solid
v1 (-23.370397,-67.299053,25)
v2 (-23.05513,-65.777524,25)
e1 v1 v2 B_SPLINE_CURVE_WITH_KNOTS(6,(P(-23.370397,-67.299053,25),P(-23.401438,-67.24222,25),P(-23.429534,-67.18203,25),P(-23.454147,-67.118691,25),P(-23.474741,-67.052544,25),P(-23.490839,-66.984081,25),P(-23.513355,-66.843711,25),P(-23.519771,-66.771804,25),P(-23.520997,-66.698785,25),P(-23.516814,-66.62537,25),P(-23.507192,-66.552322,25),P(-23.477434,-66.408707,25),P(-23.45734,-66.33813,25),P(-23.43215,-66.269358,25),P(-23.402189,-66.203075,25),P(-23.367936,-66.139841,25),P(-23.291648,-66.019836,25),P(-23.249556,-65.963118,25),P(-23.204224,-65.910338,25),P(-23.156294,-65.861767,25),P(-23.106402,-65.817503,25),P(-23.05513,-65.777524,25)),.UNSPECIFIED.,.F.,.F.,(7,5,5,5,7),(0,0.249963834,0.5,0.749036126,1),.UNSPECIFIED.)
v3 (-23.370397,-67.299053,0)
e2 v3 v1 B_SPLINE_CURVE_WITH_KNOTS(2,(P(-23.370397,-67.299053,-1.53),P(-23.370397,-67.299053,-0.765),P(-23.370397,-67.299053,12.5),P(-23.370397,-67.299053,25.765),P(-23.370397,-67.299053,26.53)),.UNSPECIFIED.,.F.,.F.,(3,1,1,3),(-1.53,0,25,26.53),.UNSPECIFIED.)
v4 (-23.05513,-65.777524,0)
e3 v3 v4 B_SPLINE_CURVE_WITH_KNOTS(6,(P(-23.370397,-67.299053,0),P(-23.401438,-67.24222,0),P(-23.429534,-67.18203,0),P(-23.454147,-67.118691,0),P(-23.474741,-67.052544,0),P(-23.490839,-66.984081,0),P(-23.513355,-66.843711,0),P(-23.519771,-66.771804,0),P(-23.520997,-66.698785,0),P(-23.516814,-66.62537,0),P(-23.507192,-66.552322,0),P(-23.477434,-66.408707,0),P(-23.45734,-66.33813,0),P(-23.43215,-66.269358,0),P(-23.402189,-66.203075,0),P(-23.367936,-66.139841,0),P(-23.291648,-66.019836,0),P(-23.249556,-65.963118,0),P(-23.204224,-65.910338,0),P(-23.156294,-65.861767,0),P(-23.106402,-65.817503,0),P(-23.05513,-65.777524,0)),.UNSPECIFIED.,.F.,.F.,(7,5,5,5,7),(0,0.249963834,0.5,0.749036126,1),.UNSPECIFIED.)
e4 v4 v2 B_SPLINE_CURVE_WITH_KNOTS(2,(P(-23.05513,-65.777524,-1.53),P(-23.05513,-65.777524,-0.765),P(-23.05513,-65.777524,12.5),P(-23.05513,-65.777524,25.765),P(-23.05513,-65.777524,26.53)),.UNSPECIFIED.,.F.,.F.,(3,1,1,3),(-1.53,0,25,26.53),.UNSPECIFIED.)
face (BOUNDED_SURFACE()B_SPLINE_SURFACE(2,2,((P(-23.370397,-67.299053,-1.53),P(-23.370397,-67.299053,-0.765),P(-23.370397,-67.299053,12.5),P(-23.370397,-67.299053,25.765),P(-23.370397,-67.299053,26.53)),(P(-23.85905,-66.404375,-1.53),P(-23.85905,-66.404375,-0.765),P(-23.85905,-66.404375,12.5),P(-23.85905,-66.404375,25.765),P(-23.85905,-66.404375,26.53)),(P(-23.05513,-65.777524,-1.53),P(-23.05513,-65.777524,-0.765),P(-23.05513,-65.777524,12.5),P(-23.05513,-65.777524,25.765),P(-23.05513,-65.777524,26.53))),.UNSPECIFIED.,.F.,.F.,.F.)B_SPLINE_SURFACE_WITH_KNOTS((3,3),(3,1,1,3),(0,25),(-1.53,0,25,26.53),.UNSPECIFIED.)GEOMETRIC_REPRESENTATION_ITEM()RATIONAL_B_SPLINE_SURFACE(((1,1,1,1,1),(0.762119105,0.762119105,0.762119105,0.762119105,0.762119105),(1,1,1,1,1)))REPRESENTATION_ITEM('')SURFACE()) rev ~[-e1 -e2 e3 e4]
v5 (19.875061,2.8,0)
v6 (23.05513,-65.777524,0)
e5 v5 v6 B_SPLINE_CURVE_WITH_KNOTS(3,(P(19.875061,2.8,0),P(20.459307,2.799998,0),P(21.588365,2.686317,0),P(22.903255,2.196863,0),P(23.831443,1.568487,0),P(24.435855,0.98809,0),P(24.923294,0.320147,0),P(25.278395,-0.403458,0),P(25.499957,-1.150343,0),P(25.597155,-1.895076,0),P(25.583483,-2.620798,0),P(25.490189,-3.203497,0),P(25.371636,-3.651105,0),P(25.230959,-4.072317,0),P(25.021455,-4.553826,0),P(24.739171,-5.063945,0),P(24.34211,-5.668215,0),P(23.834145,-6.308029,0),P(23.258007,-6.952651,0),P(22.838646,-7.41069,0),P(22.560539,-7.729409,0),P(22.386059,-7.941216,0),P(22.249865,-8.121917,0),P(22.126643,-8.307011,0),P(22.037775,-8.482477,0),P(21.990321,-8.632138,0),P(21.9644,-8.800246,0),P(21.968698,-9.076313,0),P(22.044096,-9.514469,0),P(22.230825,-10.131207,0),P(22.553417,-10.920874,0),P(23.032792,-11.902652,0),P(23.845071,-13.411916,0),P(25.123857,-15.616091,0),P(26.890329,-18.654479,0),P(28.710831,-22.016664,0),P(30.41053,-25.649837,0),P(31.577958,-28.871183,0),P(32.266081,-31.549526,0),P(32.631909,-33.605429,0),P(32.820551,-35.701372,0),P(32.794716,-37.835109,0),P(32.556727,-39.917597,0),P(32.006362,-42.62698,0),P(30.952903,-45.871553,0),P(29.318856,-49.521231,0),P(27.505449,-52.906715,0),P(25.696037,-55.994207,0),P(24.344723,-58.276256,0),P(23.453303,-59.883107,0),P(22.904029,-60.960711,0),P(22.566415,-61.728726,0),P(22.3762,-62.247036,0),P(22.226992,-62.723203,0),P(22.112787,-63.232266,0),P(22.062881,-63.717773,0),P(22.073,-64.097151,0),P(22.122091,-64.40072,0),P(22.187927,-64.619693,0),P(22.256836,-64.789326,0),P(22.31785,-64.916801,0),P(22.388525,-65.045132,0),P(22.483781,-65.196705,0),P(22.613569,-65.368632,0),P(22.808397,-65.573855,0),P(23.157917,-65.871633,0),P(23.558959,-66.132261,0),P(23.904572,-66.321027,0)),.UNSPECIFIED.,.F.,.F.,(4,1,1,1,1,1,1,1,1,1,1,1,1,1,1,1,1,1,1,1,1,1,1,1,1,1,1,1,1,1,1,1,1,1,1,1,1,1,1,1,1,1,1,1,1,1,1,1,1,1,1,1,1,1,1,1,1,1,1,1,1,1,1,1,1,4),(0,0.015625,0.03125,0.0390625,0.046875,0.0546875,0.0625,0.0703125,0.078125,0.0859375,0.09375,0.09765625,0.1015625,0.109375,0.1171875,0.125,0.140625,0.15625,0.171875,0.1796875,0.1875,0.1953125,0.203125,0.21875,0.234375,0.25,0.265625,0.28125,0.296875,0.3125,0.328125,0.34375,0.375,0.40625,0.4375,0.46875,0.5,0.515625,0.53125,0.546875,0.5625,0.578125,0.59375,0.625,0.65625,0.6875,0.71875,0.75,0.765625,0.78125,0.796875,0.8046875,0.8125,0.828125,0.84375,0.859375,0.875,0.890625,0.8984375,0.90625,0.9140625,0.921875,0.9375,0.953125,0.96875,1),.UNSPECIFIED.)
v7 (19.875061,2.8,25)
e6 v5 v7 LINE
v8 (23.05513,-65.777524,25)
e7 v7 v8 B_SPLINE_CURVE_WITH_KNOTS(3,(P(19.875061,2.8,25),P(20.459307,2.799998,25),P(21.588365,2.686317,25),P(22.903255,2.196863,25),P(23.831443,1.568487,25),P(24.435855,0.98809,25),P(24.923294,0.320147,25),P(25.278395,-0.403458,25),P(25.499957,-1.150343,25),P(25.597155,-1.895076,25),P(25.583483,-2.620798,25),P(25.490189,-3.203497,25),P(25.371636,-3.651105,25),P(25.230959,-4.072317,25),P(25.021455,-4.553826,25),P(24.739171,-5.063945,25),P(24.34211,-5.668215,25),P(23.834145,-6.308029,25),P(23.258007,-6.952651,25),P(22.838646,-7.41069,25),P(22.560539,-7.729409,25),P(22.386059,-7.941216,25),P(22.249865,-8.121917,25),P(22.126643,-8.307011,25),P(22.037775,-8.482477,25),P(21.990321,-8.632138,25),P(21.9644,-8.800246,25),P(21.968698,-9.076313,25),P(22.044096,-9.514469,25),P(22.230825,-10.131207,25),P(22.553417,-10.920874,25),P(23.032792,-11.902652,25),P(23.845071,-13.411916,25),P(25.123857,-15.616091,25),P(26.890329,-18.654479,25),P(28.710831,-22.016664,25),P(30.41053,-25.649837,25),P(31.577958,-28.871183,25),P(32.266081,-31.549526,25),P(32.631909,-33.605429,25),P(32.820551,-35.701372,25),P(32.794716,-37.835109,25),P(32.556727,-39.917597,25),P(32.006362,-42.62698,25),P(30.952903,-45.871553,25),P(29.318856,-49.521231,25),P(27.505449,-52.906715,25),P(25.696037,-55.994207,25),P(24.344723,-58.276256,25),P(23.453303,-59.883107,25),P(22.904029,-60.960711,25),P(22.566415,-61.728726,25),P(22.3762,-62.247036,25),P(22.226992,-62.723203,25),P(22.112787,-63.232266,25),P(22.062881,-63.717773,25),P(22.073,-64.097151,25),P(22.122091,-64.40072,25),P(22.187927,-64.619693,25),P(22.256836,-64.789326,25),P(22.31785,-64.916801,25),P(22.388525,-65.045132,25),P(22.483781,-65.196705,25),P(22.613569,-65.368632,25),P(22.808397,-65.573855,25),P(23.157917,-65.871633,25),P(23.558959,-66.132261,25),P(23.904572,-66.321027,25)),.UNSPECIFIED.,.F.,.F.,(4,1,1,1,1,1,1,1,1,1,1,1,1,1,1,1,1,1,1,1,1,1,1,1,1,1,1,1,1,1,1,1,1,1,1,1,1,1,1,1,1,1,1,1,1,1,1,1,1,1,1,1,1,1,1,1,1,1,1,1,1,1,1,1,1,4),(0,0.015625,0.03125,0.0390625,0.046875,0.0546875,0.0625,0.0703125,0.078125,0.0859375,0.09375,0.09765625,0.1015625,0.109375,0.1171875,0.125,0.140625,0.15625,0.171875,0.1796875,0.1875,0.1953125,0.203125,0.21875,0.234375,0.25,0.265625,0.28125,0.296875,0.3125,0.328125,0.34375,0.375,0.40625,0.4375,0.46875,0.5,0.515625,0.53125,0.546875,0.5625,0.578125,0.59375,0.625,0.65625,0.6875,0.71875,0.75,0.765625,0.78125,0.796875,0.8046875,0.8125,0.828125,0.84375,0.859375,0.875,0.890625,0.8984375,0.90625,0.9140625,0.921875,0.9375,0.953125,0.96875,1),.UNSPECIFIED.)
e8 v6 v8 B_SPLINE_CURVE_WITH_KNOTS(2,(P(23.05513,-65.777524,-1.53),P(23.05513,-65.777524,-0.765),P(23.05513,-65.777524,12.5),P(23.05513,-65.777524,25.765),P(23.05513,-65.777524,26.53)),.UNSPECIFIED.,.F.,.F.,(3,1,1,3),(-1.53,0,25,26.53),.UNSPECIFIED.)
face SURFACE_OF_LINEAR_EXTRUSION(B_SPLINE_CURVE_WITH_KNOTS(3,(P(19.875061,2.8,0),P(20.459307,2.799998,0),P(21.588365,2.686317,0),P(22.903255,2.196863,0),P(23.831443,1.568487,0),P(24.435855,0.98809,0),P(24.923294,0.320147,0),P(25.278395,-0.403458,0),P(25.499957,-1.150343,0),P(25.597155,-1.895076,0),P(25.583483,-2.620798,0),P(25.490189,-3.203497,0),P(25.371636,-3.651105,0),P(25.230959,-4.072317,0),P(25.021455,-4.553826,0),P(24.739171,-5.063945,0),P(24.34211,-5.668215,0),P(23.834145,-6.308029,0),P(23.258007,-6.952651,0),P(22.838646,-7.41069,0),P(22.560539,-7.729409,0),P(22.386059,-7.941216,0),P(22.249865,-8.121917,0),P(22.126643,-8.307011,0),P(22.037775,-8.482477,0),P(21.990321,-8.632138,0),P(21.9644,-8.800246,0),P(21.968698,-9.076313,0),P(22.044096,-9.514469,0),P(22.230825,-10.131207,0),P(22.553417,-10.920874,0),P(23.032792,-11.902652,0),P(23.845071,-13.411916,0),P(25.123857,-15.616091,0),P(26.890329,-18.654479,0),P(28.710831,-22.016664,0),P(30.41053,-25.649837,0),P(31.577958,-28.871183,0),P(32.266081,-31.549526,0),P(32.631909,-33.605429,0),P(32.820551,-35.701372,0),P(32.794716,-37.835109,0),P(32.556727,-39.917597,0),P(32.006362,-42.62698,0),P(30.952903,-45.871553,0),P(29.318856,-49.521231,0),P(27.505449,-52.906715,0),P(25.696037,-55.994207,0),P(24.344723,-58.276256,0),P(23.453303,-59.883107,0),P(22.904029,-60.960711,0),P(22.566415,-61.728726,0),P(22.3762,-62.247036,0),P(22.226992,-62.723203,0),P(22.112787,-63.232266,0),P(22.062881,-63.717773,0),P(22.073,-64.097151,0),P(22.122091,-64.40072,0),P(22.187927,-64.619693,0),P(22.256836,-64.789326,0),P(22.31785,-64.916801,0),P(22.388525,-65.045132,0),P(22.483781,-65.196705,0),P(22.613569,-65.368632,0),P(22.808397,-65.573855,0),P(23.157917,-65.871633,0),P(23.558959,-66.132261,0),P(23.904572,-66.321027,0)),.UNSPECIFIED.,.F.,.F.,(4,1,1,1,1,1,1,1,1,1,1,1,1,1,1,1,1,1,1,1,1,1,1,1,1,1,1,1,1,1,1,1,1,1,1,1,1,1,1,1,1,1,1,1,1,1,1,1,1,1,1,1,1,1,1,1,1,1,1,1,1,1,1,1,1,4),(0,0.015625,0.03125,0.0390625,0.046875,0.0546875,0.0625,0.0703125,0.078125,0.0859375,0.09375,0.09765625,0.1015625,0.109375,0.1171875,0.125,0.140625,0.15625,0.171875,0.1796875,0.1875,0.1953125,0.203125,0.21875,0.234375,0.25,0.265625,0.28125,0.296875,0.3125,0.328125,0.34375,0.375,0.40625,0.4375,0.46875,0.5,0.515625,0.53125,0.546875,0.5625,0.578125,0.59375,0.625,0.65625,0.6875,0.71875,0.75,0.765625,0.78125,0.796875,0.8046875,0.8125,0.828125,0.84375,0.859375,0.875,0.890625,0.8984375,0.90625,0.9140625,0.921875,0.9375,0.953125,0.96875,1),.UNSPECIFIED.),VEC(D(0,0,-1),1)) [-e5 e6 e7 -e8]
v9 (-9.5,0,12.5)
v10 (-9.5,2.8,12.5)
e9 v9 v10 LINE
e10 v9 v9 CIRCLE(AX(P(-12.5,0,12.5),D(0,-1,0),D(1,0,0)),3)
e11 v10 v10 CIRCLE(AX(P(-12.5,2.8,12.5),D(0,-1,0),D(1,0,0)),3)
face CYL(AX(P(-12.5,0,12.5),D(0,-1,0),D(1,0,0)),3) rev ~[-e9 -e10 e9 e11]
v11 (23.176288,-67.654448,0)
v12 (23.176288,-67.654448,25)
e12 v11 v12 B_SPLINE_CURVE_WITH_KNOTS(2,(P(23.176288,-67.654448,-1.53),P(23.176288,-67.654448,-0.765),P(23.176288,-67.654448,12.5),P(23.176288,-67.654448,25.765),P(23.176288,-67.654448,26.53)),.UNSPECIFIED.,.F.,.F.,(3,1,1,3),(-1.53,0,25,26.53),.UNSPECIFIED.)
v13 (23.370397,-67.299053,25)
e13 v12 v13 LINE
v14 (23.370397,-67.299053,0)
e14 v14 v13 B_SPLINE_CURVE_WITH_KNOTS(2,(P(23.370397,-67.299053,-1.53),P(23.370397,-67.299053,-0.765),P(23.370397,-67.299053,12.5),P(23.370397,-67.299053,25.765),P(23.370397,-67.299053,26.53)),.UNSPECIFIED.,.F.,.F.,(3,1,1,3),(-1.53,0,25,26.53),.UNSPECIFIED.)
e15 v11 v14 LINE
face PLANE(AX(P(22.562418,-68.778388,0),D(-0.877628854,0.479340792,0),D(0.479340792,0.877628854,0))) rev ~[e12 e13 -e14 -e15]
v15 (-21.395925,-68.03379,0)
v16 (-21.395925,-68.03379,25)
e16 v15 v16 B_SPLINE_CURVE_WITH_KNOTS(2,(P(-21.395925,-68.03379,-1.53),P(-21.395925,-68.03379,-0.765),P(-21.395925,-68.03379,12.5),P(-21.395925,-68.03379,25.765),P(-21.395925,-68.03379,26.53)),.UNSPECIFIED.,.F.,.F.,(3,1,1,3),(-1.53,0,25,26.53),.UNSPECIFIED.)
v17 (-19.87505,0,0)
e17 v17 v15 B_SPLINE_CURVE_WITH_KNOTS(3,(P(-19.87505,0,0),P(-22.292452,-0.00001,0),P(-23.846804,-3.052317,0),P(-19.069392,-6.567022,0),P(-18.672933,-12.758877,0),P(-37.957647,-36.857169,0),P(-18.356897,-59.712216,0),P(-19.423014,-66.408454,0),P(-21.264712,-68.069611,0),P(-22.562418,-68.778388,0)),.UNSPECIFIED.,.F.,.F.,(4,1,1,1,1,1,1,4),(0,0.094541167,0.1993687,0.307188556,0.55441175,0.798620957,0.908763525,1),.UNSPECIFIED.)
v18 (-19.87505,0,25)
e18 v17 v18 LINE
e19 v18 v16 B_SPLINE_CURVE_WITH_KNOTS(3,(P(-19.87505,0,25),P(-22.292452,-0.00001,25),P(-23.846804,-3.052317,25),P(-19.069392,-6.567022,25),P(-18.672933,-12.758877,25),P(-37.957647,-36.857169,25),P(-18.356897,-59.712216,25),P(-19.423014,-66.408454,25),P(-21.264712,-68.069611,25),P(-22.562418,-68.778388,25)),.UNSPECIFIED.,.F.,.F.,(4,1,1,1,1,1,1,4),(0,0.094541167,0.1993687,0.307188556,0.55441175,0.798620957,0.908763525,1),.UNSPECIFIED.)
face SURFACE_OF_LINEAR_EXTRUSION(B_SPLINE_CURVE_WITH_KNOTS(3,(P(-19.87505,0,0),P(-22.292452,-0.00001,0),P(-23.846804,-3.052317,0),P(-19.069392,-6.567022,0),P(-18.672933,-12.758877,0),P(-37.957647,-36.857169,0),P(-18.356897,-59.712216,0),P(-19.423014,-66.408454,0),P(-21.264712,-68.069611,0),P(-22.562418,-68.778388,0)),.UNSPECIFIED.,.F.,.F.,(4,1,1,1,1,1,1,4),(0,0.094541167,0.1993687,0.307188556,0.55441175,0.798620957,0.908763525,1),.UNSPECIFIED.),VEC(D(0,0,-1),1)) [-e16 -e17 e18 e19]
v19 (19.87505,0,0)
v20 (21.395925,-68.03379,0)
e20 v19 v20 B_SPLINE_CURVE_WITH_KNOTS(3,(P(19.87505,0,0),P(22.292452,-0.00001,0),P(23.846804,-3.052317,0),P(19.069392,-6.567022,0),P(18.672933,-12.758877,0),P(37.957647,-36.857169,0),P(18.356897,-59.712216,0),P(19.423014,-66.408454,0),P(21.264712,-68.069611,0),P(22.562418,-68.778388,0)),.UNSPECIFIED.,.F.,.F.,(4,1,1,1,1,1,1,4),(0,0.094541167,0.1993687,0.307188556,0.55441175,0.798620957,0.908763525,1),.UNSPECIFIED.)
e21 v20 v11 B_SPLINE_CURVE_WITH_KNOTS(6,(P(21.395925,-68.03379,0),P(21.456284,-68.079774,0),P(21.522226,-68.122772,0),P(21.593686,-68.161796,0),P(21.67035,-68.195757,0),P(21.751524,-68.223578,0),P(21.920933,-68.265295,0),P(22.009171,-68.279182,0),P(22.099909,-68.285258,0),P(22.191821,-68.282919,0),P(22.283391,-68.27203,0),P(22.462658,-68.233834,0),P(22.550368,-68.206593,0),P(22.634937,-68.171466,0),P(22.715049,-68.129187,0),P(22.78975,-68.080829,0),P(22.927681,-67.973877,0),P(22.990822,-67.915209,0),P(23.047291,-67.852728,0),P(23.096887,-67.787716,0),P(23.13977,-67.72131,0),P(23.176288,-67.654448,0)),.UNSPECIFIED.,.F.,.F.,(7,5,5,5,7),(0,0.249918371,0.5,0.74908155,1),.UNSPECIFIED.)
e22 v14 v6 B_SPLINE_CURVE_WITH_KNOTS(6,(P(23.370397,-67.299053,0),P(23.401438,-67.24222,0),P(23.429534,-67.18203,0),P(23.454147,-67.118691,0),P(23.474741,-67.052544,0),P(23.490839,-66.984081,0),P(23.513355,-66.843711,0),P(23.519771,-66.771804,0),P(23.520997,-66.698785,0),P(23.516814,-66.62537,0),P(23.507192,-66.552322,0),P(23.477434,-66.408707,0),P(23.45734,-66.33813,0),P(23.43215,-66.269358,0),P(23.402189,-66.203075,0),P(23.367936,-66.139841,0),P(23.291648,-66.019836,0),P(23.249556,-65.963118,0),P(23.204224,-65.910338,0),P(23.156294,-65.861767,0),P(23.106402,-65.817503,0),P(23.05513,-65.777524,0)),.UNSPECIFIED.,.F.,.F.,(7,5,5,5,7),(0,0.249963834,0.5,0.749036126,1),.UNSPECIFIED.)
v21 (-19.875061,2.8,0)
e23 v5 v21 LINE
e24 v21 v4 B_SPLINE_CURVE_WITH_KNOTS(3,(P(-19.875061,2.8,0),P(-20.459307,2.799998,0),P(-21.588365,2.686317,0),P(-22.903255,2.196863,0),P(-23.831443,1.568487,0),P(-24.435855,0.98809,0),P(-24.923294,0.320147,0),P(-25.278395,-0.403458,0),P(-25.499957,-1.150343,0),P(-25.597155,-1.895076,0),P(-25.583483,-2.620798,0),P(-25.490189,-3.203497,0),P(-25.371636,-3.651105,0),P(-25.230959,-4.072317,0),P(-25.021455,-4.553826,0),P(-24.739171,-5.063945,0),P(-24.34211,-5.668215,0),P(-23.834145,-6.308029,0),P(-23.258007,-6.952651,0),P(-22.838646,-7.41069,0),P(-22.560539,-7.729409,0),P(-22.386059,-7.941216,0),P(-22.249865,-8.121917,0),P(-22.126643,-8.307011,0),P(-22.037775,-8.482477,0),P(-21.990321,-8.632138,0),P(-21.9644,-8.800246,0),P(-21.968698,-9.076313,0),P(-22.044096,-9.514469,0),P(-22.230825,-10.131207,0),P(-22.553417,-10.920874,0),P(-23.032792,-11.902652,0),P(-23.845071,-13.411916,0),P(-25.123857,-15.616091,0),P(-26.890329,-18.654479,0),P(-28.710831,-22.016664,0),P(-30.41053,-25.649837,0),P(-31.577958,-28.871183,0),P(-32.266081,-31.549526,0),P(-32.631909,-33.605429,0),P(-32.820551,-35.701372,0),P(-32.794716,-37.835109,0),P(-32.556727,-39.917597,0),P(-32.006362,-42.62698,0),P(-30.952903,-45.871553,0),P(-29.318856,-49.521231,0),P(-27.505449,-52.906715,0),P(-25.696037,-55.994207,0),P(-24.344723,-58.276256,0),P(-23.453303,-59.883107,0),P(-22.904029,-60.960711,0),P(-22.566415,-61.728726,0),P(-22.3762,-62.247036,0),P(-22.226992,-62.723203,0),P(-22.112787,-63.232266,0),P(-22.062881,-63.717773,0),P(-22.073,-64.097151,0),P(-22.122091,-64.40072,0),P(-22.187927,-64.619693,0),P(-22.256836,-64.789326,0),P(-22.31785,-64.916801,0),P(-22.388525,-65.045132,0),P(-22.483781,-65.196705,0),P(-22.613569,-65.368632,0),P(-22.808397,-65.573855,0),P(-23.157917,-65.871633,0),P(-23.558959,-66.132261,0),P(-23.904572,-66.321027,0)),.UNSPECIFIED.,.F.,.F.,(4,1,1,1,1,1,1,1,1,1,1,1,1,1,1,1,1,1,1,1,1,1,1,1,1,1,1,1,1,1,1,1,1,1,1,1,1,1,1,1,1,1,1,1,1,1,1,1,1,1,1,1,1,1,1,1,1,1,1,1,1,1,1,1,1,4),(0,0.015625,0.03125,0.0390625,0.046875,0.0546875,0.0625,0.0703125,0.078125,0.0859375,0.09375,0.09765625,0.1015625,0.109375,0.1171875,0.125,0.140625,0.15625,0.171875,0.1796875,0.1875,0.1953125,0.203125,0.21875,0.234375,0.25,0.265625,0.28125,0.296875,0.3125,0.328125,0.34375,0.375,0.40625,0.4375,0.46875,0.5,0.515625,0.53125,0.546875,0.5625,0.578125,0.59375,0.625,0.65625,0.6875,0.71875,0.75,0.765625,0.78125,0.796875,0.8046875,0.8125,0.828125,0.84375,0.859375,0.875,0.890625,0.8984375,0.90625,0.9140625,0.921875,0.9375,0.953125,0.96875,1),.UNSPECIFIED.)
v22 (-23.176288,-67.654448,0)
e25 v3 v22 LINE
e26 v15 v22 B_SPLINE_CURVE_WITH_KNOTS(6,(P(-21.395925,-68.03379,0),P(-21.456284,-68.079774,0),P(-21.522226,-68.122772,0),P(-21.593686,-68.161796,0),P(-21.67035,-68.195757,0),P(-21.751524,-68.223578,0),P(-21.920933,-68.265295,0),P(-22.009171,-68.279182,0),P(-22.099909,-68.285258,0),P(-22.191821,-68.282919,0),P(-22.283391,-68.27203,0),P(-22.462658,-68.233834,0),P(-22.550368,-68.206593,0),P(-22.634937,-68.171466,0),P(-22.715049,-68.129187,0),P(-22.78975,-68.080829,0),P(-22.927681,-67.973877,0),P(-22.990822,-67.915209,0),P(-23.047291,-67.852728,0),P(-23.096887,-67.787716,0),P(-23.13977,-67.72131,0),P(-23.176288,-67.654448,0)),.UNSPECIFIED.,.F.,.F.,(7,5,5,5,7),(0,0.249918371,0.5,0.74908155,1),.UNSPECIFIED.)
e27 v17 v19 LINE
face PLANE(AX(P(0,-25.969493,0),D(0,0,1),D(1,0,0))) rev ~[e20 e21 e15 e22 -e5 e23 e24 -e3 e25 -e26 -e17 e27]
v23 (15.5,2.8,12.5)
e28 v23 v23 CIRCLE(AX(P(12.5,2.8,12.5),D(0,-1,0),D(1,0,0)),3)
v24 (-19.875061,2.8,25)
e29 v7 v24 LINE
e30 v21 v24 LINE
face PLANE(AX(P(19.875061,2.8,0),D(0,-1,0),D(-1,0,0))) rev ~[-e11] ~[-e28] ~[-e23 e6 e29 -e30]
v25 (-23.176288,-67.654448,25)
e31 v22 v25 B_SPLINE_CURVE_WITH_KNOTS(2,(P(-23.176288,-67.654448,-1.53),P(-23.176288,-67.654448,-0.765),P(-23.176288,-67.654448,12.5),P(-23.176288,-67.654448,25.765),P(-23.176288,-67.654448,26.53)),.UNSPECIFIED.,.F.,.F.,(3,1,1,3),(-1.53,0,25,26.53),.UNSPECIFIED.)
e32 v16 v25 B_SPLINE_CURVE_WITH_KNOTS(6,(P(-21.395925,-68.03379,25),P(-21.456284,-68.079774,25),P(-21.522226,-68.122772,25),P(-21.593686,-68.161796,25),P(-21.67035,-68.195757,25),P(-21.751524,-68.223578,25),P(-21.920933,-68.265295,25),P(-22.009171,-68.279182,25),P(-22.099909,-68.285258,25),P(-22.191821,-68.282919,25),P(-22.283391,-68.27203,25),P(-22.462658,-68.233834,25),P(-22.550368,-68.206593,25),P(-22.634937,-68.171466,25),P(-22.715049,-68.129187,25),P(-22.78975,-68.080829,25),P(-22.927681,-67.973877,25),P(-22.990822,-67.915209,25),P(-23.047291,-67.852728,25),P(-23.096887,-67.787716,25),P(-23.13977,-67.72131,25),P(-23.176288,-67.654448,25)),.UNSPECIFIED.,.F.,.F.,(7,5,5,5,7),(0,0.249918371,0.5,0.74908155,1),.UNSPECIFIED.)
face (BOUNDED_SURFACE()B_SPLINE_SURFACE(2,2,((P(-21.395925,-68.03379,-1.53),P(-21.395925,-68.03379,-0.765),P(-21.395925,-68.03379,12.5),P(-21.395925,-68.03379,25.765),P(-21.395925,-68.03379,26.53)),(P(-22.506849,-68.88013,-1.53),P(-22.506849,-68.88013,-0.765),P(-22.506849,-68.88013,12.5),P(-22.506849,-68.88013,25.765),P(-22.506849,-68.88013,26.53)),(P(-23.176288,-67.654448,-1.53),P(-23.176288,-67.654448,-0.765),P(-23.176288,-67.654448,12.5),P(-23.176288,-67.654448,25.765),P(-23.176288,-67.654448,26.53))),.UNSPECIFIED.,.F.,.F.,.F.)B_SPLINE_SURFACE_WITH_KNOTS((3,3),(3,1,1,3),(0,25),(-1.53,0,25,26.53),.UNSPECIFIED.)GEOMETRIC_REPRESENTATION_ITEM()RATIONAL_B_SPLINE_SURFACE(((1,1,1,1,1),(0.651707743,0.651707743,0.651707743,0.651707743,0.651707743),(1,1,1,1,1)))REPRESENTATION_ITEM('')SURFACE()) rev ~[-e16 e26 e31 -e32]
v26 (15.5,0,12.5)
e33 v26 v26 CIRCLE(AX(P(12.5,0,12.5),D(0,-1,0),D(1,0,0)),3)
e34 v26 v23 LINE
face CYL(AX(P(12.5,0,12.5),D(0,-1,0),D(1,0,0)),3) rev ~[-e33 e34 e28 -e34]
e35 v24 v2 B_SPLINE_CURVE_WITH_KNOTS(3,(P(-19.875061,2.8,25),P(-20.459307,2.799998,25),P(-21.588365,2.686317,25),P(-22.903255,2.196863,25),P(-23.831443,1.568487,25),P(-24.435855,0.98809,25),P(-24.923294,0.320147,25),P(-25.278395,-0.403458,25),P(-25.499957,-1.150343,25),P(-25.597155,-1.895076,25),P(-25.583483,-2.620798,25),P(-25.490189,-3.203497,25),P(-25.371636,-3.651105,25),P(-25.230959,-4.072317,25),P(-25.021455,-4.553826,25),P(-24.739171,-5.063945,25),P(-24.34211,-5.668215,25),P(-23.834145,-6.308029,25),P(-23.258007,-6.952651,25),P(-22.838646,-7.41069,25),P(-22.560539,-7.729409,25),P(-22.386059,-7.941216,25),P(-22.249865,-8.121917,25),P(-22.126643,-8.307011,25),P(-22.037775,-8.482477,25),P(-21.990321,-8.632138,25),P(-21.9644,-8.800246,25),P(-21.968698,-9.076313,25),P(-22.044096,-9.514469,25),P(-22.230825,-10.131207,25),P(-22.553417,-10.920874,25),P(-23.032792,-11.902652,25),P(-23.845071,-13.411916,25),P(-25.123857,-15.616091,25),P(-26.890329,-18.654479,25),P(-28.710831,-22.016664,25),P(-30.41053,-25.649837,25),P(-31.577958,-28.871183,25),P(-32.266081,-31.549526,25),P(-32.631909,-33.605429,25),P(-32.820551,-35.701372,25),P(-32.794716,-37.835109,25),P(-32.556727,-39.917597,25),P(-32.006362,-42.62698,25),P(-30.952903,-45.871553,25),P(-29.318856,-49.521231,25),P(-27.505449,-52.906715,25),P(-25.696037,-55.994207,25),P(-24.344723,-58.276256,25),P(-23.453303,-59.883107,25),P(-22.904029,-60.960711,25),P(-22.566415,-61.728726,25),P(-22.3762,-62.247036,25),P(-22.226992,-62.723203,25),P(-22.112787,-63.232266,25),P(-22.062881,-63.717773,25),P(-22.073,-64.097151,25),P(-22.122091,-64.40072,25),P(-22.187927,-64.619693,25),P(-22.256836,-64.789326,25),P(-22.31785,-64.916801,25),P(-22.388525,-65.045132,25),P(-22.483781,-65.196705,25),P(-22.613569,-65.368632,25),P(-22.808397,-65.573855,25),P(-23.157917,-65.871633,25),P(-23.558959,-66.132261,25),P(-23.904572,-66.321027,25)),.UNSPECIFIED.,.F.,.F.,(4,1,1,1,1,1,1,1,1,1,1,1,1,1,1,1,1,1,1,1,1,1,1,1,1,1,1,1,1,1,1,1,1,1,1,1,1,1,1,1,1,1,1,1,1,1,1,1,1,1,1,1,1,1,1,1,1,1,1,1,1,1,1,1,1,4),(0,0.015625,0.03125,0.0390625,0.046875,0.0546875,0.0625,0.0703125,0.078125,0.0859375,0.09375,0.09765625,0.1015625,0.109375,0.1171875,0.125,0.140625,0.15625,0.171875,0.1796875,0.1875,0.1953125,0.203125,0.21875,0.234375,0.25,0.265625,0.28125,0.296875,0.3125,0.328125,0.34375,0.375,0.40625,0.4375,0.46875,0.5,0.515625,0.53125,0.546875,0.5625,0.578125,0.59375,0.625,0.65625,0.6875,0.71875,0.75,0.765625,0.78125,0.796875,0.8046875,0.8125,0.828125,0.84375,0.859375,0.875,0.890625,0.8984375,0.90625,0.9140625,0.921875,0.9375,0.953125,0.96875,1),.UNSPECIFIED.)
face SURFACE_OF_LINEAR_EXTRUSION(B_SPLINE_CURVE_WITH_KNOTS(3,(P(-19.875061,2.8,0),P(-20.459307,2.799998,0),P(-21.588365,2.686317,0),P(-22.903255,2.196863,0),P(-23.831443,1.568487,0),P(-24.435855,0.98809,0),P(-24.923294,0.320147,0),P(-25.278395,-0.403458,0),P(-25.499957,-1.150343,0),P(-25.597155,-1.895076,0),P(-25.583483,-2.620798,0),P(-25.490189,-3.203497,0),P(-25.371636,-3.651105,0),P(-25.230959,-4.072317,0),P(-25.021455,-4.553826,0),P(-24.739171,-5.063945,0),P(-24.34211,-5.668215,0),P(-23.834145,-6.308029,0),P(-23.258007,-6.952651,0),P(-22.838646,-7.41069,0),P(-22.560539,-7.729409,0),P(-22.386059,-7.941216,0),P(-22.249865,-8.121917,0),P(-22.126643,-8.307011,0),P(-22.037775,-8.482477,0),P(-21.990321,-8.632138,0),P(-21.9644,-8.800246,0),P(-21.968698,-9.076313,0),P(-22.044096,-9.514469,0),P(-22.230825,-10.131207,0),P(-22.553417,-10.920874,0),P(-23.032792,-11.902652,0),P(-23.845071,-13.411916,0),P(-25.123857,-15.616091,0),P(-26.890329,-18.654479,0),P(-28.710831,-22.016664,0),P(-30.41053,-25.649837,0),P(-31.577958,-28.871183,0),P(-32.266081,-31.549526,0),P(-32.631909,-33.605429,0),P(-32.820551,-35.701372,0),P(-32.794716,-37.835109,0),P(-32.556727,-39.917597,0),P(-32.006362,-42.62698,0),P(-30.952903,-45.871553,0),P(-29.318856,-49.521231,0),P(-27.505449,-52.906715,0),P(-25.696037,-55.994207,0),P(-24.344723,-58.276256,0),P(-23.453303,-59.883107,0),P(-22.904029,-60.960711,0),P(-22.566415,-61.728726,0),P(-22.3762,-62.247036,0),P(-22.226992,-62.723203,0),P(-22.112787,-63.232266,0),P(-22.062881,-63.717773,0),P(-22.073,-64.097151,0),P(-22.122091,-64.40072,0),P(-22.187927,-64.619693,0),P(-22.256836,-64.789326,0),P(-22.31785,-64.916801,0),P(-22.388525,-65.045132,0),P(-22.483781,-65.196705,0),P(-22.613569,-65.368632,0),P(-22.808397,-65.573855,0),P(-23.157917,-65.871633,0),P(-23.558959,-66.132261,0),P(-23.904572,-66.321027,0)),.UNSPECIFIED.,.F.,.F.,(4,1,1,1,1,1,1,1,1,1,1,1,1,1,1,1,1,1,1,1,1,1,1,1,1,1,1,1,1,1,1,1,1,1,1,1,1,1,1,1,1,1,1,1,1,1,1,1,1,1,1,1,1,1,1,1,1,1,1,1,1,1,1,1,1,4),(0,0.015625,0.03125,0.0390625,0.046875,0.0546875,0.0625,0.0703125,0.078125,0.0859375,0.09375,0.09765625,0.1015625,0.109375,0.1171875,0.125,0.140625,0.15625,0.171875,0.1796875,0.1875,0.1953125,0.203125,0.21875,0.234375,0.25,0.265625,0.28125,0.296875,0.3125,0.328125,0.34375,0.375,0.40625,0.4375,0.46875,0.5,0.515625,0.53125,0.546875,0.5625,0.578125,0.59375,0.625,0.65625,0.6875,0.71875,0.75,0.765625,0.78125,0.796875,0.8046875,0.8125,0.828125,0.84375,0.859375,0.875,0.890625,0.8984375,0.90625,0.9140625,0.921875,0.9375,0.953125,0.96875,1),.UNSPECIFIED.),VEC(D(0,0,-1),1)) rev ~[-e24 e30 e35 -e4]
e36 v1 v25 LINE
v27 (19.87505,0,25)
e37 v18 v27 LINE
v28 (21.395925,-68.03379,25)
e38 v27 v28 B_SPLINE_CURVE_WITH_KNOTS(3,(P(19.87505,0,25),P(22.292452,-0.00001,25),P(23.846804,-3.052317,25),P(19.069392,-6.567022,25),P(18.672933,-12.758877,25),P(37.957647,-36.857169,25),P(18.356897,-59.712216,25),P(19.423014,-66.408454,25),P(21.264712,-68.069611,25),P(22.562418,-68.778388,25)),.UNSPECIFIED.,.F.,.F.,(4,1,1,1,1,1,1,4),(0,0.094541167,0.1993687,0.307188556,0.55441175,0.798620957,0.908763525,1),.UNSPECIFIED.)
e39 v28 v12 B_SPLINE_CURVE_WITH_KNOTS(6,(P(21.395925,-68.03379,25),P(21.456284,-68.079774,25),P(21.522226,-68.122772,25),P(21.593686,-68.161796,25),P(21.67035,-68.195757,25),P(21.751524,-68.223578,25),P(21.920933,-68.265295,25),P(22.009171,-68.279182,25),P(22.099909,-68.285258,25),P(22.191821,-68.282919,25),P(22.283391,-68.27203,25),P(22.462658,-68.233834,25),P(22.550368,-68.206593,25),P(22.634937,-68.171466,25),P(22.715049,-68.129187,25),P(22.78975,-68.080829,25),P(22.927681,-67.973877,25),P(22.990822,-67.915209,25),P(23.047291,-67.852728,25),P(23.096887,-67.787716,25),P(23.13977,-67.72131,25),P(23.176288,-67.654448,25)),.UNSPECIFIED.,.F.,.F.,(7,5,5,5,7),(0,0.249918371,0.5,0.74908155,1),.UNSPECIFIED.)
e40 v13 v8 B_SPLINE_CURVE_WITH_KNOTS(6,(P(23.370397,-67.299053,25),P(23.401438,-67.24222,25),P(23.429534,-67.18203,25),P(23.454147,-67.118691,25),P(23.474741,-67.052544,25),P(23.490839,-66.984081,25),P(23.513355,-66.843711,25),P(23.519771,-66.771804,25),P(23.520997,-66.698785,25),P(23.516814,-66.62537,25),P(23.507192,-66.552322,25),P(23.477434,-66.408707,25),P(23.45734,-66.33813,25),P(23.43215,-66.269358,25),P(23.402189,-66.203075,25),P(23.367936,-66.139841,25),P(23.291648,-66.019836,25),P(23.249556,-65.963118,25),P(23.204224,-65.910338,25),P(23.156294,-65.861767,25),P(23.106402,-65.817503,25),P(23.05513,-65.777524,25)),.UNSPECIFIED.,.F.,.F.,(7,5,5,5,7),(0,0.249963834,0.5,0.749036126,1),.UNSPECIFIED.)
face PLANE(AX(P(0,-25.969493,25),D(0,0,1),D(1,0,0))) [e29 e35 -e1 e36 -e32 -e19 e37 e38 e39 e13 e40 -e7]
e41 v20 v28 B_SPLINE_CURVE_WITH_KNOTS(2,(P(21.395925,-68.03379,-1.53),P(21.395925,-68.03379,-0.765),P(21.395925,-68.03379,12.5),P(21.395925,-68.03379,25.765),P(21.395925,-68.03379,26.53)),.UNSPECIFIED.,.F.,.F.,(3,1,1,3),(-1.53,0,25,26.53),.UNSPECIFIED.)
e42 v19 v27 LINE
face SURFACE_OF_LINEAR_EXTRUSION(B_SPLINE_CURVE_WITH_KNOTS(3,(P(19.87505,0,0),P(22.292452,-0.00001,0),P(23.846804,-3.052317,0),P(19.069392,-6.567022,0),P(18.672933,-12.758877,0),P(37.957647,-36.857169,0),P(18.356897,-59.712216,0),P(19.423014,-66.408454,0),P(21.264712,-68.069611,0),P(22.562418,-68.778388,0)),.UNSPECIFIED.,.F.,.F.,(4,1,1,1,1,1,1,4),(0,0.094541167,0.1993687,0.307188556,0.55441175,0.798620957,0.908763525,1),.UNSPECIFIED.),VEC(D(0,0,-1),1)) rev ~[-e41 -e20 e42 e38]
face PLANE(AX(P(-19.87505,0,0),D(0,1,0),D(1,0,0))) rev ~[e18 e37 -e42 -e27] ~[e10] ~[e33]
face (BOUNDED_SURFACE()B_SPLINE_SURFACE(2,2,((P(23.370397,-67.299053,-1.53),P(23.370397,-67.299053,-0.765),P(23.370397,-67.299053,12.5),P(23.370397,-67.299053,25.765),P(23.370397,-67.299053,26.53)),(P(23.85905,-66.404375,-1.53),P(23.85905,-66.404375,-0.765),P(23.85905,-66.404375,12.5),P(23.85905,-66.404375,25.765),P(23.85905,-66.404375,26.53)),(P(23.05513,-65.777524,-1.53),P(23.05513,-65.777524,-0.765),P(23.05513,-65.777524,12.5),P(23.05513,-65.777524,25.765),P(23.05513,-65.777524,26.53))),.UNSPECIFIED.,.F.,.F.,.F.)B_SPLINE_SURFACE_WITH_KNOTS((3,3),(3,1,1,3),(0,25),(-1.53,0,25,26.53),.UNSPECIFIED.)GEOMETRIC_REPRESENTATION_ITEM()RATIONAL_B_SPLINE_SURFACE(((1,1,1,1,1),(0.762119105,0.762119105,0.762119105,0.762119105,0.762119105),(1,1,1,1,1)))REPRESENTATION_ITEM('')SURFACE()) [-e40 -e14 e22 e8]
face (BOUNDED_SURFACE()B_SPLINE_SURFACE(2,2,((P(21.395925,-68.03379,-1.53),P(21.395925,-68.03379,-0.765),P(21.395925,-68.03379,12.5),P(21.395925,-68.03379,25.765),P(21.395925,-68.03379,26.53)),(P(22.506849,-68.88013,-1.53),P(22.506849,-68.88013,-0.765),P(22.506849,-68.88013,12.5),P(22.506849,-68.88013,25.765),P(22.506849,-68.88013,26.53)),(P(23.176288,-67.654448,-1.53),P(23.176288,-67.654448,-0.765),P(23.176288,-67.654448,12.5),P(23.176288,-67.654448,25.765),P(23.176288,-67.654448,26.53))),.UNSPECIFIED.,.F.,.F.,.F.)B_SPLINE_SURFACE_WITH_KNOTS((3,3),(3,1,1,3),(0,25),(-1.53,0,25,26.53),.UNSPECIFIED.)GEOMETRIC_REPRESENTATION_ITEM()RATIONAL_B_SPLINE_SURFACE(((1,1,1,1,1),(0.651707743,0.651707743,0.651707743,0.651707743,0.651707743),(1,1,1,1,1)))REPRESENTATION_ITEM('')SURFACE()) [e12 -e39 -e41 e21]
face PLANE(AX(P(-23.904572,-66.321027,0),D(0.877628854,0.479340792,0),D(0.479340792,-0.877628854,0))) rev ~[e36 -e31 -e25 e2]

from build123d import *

# Parameters (mm, degrees)
F1_DEPTH = 25
F2_R     = 3
F3_DEPTH = 25
F4_R     = 1.2


# Not quite as in the source:
# - the dataset's text gives a spline's control points without its knots; the knots are read off the source's solid


with BuildPart() as f1:
    # F0 (on Top) → F1 (new body)
    with BuildSketch(Plane.XY):
        with BuildLine():
            Line((-19.8750495911, 0), (0, 0))
            Line((0, 0), (19.8750495911, 0))
            add(Edge.make_bspline(
                [(19.8750495911, 0), (22.2924524796, -9.5208e-06), (23.8468038816, -3.0523168549), (19.0693924552, -6.5670221707), (18.6729332639, -12.7588770638), (37.9576470343, -36.8571689193), (18.3568969249, -59.7122156399), (19.423014069, -66.4084536548), (21.2647124099, -68.0696110384), (22.562418133, -68.7783882022)],
                knots=[0, 0, 0, 0, 0.0945411672, 0.1993686999, 0.3071885555, 0.5544117499, 0.7986209568, 0.9087635251, 1, 1, 1, 1], degree=3))
            Line((22.562418133, -68.7783882022), (23.9045723519, -66.3210274121))
            add(Edge.make_bspline(
                [(19.8750606187, 2.8), (20.4593069859, 2.799997699), (21.5883647785, 2.6863173566), (22.9032546448, 2.1968633988), (23.8314426543, 1.5684869445), (24.435854505, 0.9880902727), (24.9232939323, 0.3201474741), (25.2783951523, -0.4034584687), (25.4999568914, -1.1503426565), (25.5971545038, -1.8950756512), (25.5834825611, -2.6207983738), (25.4901886128, -3.2034968646), (25.3716356249, -3.6511053376), (25.2309586179, -4.0723173675), (25.0214545116, -4.5538263985), (24.7391708776, -5.0639453956), (24.3421099364, -5.6682154891), (23.8341446747, -6.3080287414), (23.2580066814, -6.9526509281), (22.8386460714, -7.410690486), (22.5605388052, -7.729409075), (22.3860591598, -7.9412155998), (22.2498645667, -8.1219170001), (22.1266426007, -8.3070114205), (22.0377754259, -8.4824771505), (21.9903206529, -8.6321382793), (21.9643998721, -8.8002455288), (21.9686979601, -9.0763133266), (22.0440959051, -9.5144686085), (22.2308250058, -10.1312073308), (22.5534171189, -10.9208744064), (23.0327923343, -11.902651775), (23.8450711076, -13.4119164755), (25.1238572248, -15.6160909141), (26.8903289815, -18.6544793295), (28.7108310762, -22.0166637858), (30.4105304557, -25.6498365655), (31.5779576864, -28.871182811), (32.2660810741, -31.5495260763), (32.6319090351, -33.6054292675), (32.8205512079, -35.7013715538), (32.794715562, -37.8351090141), (32.5567271095, -39.9175968775), (32.0063619416, -42.6269799256), (30.952903282, -45.8715528951), (29.318855882, -49.5212306518), (27.5054488177, -52.9067151854), (25.696037368, -55.9942070619), (24.3447227252, -58.2762559642), (23.4533034554, -59.8831067643), (22.904028849, -60.9607111118), (22.5664151147, -61.7287262628), (22.3761997694, -62.2470363726), (22.2269924721, -62.7232034294), (22.1127869942, -63.2322655125), (22.0628810378, -63.7177729426), (22.0729996001, -64.0971510525), (22.1220907308, -64.4007199093), (22.1879270254, -64.6196927194), (22.2568363773, -64.7893256597), (22.317850339, -64.9168005859), (22.3885249864, -65.0451322219), (22.4837806609, -65.1967051299), (22.61356875, -65.3686320853), (22.8083966888, -65.5738545979), (23.1579171235, -65.8716332359), (23.5589591357, -66.1322613839), (23.9045723519, -66.3210274121)],
                knots=[0, 0, 0, 0, 0.015625, 0.03125, 0.0390625, 0.046875, 0.0546875, 0.0625, 0.0703125, 0.078125, 0.0859375, 0.09375, 0.09765625, 0.1015625, 0.109375, 0.1171875, 0.125, 0.140625, 0.15625, 0.171875, 0.1796875, 0.1875, 0.1953125, 0.203125, 0.21875, 0.234375, 0.25, 0.265625, 0.28125, 0.296875, 0.3125, 0.328125, 0.34375, 0.375, 0.40625, 0.4375, 0.46875, 0.5, 0.515625, 0.53125, 0.546875, 0.5625, 0.578125, 0.59375, 0.625, 0.65625, 0.6875, 0.71875, 0.75, 0.765625, 0.78125, 0.796875, 0.8046875, 0.8125, 0.828125, 0.84375, 0.859375, 0.875, 0.890625, 0.8984375, 0.90625, 0.9140625, 0.921875, 0.9375, 0.953125, 0.96875, 1, 1, 1, 1], degree=3))
            Line((19.8750606187, 2.8), (0, 2.8))
            Line((0, 2.8), (-19.8750606187, 2.8))
            add(Edge.make_bspline(
                [(-19.8750606187, 2.8), (-20.4593069859, 2.799997699), (-21.5883647785, 2.6863173566), (-22.9032546448, 2.1968633988), (-23.8314426543, 1.5684869445), (-24.435854505, 0.9880902727), (-24.9232939323, 0.3201474741), (-25.2783951523, -0.4034584687), (-25.4999568914, -1.1503426565), (-25.5971545038, -1.8950756512), (-25.5834825611, -2.6207983738), (-25.4901886128, -3.2034968646), (-25.3716356249, -3.6511053376), (-25.2309586179, -4.0723173675), (-25.0214545116, -4.5538263985), (-24.7391708776, -5.0639453956), (-24.3421099364, -5.6682154891), (-23.8341446747, -6.3080287414), (-23.2580066814, -6.9526509281), (-22.8386460714, -7.410690486), (-22.5605388052, -7.729409075), (-22.3860591598, -7.9412155998), (-22.2498645667, -8.1219170001), (-22.1266426007, -8.3070114205), (-22.0377754259, -8.4824771505), (-21.9903206529, -8.6321382793), (-21.9643998721, -8.8002455288), (-21.9686979601, -9.0763133266), (-22.0440959051, -9.5144686085), (-22.2308250058, -10.1312073308), (-22.5534171189, -10.9208744064), (-23.0327923343, -11.902651775), (-23.8450711076, -13.4119164755), (-25.1238572248, -15.6160909141), (-26.8903289815, -18.6544793295), (-28.7108310762, -22.0166637858), (-30.4105304557, -25.6498365655), (-31.5779576864, -28.871182811), (-32.2660810741, -31.5495260763), (-32.6319090351, -33.6054292675), (-32.8205512079, -35.7013715538), (-32.794715562, -37.8351090141), (-32.5567271095, -39.9175968775), (-32.0063619416, -42.6269799256), (-30.952903282, -45.8715528951), (-29.318855882, -49.5212306518), (-27.5054488177, -52.9067151854), (-25.696037368, -55.9942070619), (-24.3447227252, -58.2762559642), (-23.4533034554, -59.8831067643), (-22.904028849, -60.9607111118), (-22.5664151147, -61.7287262628), (-22.3761997694, -62.2470363726), (-22.2269924721, -62.7232034294), (-22.1127869942, -63.2322655125), (-22.0628810378, -63.7177729426), (-22.0729996001, -64.0971510525), (-22.1220907308, -64.4007199093), (-22.1879270254, -64.6196927194), (-22.2568363773, -64.7893256597), (-22.317850339, -64.9168005859), (-22.3885249864, -65.0451322219), (-22.4837806609, -65.1967051299), (-22.61356875, -65.3686320853), (-22.8083966888, -65.5738545979), (-23.1579171235, -65.8716332359), (-23.5589591357, -66.1322613839), (-23.9045723519, -66.3210274121)],
                knots=[0, 0, 0, 0, 0.015625, 0.03125, 0.0390625, 0.046875, 0.0546875, 0.0625, 0.0703125, 0.078125, 0.0859375, 0.09375, 0.09765625, 0.1015625, 0.109375, 0.1171875, 0.125, 0.140625, 0.15625, 0.171875, 0.1796875, 0.1875, 0.1953125, 0.203125, 0.21875, 0.234375, 0.25, 0.265625, 0.28125, 0.296875, 0.3125, 0.328125, 0.34375, 0.375, 0.40625, 0.4375, 0.46875, 0.5, 0.515625, 0.53125, 0.546875, 0.5625, 0.578125, 0.59375, 0.625, 0.65625, 0.6875, 0.71875, 0.75, 0.765625, 0.78125, 0.796875, 0.8046875, 0.8125, 0.828125, 0.84375, 0.859375, 0.875, 0.890625, 0.8984375, 0.90625, 0.9140625, 0.921875, 0.9375, 0.953125, 0.96875, 1, 1, 1, 1], degree=3))
            Line((-23.9045723519, -66.3210274121), (-22.562418133, -68.7783882022))
            add(Edge.make_bspline(
                [(-19.8750495911, 0), (-22.2924524796, -9.5208e-06), (-23.8468038816, -3.0523168549), (-19.0693924552, -6.5670221707), (-18.6729332639, -12.7588770638), (-37.9576470343, -36.8571689193), (-18.3568969249, -59.7122156399), (-19.423014069, -66.4084536548), (-21.2647124099, -68.0696110384), (-22.562418133, -68.7783882022)],
                knots=[0, 0, 0, 0, 0.0945411672, 0.1993686999, 0.3071885555, 0.5544117499, 0.7986209568, 0.9087635251, 1, 1, 1, 1], degree=3))
        make_face()
    extrude(amount=F1_DEPTH)

    # F2 (on face) → F3 (cut)
    with BuildSketch(Plane.XZ):
        with Locations((-12.5, 12.5)):
            Circle(F2_R)
        with Locations((12.5, 12.5)):
            Circle(F2_R)
    extrude(amount=-F3_DEPTH, mode=Mode.SUBTRACT)

    # F4
    f4_edges = [f1.edges().sort_by_distance(p)[0] for p in [
        (-22.562418, -68.778388, 12.5),
        (-23.904572, -66.321027, 12.5),
        (22.562418, -68.778388, 12.5),
        (23.904572, -66.321027, 12.5),
    ]]
    fillet(f4_edges, radius=F4_R)


solid = f1.part
